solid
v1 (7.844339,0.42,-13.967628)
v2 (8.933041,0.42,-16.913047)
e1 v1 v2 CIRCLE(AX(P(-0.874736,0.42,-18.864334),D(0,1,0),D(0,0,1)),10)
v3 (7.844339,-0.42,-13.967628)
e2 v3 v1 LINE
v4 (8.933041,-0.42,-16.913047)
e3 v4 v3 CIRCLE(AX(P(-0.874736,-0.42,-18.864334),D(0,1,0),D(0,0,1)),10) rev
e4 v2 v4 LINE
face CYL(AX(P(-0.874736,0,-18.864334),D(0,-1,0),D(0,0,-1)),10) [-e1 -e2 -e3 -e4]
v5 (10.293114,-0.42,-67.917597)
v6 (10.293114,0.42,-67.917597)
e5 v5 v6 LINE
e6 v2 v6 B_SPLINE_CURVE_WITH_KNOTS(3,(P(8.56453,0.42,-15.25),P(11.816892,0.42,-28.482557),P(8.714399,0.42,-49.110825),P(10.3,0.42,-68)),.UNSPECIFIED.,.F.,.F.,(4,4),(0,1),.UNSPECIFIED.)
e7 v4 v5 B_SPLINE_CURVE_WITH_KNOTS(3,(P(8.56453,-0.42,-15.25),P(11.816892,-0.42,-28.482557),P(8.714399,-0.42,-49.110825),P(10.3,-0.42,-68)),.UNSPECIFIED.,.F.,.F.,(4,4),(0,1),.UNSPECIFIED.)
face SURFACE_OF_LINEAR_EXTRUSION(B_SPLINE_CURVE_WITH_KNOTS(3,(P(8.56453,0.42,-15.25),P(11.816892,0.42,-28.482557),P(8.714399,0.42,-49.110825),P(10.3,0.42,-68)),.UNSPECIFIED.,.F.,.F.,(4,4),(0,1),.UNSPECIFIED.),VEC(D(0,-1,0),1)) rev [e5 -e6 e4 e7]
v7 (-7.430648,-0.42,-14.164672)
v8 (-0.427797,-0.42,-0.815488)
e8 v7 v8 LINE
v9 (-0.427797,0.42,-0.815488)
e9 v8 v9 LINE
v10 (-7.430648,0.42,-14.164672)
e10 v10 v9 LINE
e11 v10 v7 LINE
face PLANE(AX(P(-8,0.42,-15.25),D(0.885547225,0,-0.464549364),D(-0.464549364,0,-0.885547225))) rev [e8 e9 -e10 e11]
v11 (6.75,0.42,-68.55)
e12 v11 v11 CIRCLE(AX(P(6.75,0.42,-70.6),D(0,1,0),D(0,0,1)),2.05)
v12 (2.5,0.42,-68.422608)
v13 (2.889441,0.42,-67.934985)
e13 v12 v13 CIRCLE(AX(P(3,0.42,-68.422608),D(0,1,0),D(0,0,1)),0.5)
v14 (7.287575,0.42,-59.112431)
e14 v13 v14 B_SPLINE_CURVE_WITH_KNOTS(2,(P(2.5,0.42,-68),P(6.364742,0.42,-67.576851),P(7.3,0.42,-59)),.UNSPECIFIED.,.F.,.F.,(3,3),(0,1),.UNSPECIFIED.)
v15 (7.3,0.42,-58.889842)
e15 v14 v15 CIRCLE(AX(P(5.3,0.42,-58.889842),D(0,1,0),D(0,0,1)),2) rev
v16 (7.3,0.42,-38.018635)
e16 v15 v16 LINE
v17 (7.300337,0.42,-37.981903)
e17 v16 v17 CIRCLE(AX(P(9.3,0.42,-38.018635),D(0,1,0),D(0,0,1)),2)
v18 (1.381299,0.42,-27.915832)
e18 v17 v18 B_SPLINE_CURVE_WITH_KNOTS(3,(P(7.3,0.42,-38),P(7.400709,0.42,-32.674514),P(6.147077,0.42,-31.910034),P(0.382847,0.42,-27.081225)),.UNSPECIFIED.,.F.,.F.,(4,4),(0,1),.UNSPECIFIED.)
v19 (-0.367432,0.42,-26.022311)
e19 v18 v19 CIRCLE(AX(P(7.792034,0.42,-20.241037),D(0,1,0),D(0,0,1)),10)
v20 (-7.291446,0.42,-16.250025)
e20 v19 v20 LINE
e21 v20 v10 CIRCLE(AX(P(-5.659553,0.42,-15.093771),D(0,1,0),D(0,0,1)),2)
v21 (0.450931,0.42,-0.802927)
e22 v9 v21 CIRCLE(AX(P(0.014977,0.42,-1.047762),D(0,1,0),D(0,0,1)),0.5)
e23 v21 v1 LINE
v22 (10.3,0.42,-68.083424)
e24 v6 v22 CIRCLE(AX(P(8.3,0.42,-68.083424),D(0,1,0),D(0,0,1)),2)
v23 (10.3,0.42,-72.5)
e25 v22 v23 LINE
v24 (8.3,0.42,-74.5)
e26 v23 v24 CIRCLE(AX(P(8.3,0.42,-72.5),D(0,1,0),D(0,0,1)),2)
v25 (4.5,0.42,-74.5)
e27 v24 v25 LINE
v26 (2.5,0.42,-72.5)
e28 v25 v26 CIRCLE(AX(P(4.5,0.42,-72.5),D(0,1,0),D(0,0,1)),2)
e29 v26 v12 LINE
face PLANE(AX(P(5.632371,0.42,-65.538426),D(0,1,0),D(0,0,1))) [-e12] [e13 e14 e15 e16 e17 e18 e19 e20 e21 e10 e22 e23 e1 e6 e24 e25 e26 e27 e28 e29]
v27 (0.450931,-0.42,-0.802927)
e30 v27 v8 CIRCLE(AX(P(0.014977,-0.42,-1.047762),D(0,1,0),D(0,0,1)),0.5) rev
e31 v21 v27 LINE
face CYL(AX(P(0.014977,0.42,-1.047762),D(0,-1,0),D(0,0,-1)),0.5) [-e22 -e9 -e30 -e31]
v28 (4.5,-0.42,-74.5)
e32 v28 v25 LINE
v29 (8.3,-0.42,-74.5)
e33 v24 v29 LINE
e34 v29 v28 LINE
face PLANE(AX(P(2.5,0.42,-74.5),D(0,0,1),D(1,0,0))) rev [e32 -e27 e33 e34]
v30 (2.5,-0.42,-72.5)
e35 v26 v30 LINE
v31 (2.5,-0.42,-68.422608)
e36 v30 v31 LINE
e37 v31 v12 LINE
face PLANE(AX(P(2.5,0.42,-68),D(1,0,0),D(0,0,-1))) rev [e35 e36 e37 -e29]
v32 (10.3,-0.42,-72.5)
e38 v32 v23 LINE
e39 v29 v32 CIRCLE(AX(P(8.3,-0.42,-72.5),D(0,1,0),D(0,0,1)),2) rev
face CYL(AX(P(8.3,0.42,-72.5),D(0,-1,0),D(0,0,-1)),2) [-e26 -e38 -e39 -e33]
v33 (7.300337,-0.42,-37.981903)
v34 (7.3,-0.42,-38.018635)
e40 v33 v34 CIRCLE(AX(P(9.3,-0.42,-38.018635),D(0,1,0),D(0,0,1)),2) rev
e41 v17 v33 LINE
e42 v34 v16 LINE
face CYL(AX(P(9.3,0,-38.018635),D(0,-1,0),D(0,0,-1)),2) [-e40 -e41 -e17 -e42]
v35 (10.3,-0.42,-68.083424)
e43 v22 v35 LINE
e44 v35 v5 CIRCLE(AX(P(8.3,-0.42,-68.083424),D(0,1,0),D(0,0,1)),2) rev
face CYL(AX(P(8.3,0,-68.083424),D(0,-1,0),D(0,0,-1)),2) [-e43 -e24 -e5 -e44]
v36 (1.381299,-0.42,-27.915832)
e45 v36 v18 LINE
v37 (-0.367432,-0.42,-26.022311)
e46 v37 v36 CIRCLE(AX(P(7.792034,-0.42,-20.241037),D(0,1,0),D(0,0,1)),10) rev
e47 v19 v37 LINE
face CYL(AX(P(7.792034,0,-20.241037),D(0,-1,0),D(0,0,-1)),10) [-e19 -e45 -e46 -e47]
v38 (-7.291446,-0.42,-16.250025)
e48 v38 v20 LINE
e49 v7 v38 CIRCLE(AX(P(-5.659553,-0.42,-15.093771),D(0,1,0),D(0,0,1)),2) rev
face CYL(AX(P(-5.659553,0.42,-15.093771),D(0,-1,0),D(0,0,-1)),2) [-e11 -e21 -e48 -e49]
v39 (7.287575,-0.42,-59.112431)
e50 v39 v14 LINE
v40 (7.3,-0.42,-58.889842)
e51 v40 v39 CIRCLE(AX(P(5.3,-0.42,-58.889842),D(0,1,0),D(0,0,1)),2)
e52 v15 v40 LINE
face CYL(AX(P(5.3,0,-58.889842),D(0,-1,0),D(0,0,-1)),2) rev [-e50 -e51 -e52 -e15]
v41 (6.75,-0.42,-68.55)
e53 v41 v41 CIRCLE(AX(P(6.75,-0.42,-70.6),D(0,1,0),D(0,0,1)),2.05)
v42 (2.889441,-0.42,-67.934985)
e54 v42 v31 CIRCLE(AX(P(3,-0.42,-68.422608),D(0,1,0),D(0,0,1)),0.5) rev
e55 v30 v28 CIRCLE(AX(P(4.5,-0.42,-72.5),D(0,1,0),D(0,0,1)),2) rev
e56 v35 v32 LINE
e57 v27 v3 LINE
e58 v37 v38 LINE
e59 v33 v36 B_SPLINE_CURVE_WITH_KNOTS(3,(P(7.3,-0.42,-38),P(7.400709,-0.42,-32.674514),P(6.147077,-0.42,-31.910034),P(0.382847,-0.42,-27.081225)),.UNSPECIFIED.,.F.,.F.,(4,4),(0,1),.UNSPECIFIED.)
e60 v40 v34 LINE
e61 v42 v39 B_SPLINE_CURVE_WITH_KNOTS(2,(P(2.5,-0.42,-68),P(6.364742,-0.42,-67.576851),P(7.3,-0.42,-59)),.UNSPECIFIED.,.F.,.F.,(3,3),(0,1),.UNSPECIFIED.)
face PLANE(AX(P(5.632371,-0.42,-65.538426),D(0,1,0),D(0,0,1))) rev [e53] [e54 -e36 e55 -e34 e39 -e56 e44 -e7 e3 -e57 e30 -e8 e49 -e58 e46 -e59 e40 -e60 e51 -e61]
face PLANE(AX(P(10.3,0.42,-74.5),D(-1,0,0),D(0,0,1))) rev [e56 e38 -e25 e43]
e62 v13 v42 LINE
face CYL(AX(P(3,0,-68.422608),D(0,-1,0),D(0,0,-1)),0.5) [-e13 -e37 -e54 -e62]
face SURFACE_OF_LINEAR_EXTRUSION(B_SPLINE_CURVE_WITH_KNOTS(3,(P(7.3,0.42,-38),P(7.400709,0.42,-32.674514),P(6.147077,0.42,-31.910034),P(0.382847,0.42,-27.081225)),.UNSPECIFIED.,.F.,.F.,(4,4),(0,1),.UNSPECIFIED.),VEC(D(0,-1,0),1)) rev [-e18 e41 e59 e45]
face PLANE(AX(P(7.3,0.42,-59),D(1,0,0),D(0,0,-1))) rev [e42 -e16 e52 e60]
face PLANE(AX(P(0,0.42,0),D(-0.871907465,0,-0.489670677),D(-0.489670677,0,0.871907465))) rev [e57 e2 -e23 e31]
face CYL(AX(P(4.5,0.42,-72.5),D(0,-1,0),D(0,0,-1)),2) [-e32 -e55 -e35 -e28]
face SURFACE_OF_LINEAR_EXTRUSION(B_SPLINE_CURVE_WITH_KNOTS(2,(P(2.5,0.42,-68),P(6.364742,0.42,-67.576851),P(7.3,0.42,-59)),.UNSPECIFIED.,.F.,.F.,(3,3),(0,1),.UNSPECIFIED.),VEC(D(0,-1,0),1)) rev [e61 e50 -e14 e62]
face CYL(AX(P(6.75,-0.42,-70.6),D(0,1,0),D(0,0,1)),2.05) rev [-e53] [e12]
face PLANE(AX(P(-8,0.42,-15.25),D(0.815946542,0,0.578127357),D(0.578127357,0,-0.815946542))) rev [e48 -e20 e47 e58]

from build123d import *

# Parameters (mm, degrees)
BOSS_EXTRUDE1_DEPTH = 0.42
SKETCH2_R           = 2.05
CUT_EXTRUDE1_DEPTH  = 76.213334038
FILLET1_R           = 10
FILLET2_R           = 0.5
FILLET3_R           = 2
FILLET4_R           = 2
FILLET5_R           = 0.5
FILLET6_R           = 2


with BuildPart() as part:
    # Sketch1 → Boss-Extrude1 (new, symmetric)
    with BuildSketch(Plane(origin=(0, 0, 0), x_dir=(1, 0, 0), z_dir=(0, 1, 0))):
        with BuildLine():
            Line((2.5, 68), (2.5, 74.5))
            Line((2.5, 74.5), (10.3, 74.5))
            Line((10.3, 74.5), (10.3, 68))
            add(Edge.make_bspline(
                [(10.3, 68), (8.714398617, 49.11082539), (11.816891749, 28.482557039), (8.564530207, 15.25)],
                knots=[0, 0, 0, 0, 1, 1, 1, 1], degree=3))
            Line((8.564530207, 15.25), (0, 0))
            Line((0, 0), (-8, 15.25))
            Line((-8, 15.25), (0.382846681, 27.081224853))
            add(Edge.make_bspline(
                [(7.3, 38), (7.400709228, 32.674514217), (6.147076675, 31.910033807), (0.382846681, 27.081224853)],
                knots=[0, 0, 0, 0, 1, 1, 1, 1], degree=3))
            Line((7.3, 38), (7.3, 59))
            add(Edge.make_bspline(
                [(2.5, 68), (6.364741582, 67.576851124), (7.3, 59)],
                knots=[0, 0, 0, 1, 1, 1], degree=2))
        make_face()
    extrude(amount=BOSS_EXTRUDE1_DEPTH, both=True)

    # Sketch2 → Cut-Extrude1 (cut, through all)
    with BuildSketch(Plane(origin=(0, 0.42, 0), x_dir=(1, 0, 0), z_dir=(0, 1, 0))):
        with Locations(Location((6.75, 70.6, 0), (0, 0, 270))):
            Circle(SKETCH2_R)
    extrude(amount=-CUT_EXTRUDE1_DEPTH, mode=Mode.SUBTRACT)

    # Fillet1
    fillet1_edges = [part.edges().sort_by_distance(p)[0] for p in [
        (8.564530207, -0.21, -15.25),
        (0.382846681, -0.21, -27.081224853),
    ]]
    fillet(fillet1_edges, radius=FILLET1_R)

    # Fillet2
    fillet2_edges = [part.edges().sort_by_distance(p)[0] for p in [
        (2.5, -0.21, -68),
    ]]
    fillet(fillet2_edges, radius=FILLET2_R)

    # Fillet3
    fillet3_edges = [part.edges().sort_by_distance(p)[0] for p in [
        (2.5, 0, -74.5),
        (10.3, 0, -74.5),
    ]]
    fillet(fillet3_edges, radius=FILLET3_R)

    # Fillet4
    fillet4_edges = [part.edges().sort_by_distance(p)[0] for p in [
        (-8, 0, -15.25),
    ]]
    fillet(fillet4_edges, radius=FILLET4_R)

    # Fillet5
    fillet5_edges = [part.edges().sort_by_distance(p)[0] for p in [
        (0, 0, 0),
    ]]
    fillet(fillet5_edges, radius=FILLET5_R)

    # Fillet6
    # the kernel refuses this fillet: 2 mm, written as the material it adds along each edge
    with BuildSketch(Plane(origin=(7.3, 0, -59), x_dir=(0, 0, 1), z_dir=(0, -1, 0))) as fillet6_piece_1:
        with BuildLine():
            CenterArc((0.110157954, 2), FILLET6_R, 263.610060097, 6.389939903)
            ThreePointArc((-0.112430932, 0.012425048), (-0.056219986, 0.006171626), (0, 0))
            Line((0, 0), (0.110157954, 0))
        make_face()
    extrude(amount=0.42)
    with BuildSketch(Plane(origin=(7.3, 0, -59), x_dir=(0, 0, 1), z_dir=(0, 1, 0))) as fillet6_piece_2:
        with BuildLine():
            CenterArc((0.110157954, -2), FILLET6_R, 90, 6.389939903)
            ThreePointArc((-0.112430932, -0.012425048), (-0.056219986, -0.006171626), (0, 0))
            Line((0, 0), (0.110157954, 0))
        make_face()
    extrude(amount=0.42)
    # the kernel refuses this fillet: 2 mm, written as the material it takes off along each edge
    with BuildSketch(Plane(origin=(7.3, 0.046586814, -38), x_dir=(0, 0, -1), z_dir=(0, -1, 0))) as fillet6_2_piece_1:
        with BuildLine():
            CenterArc((0.018634726, 2), FILLET6_R, 268.947653116, 1.052346884)
            ThreePointArc((-0.018097045, 0.000337334), (-0.0090485, 0.000169892), (0, 0))
            Line((0, 0), (0.018634726, 0))
        make_face()
    extrude(amount=0.513173628, mode=Mode.SUBTRACT)
    with BuildSketch(Plane(origin=(10.3, 0, -68), x_dir=(-0.08328041944419425, 0, 0.9965261520588404), z_dir=(0, -1, 0))) as fillet6_2_piece_2:
        with BuildLine():
            CenterArc((0.083426948, 1.999999864), FILLET6_R, 265.222850471, 4.756036045)
            Line((-0.083133891, 0.00694756), (0, 0))
            ThreePointArc((0, 0), (0.041344974, 7.623e-06), (0.082689948, 0))
        make_face()
    extrude(amount=0.628559231, mode=Mode.SUBTRACT)
    with BuildSketch(Plane(origin=(10.3, 0, -68), x_dir=(-0.08328041944419425, 0, 0.9965261520588404), z_dir=(0, 1, 0))) as fillet6_2_piece_3:
        with BuildLine():
            CenterArc((0.083426948, -1.999999864), FILLET6_R, 90.021113485, 4.756036045)
            Line((-0.083133891, -0.00694756), (0, 0))
            ThreePointArc((0, 0), (0.041344974, -7.623e-06), (0.082689948, 0))
        make_face()
    extrude(amount=0.628559231, mode=Mode.SUBTRACT)


solid = part.part
